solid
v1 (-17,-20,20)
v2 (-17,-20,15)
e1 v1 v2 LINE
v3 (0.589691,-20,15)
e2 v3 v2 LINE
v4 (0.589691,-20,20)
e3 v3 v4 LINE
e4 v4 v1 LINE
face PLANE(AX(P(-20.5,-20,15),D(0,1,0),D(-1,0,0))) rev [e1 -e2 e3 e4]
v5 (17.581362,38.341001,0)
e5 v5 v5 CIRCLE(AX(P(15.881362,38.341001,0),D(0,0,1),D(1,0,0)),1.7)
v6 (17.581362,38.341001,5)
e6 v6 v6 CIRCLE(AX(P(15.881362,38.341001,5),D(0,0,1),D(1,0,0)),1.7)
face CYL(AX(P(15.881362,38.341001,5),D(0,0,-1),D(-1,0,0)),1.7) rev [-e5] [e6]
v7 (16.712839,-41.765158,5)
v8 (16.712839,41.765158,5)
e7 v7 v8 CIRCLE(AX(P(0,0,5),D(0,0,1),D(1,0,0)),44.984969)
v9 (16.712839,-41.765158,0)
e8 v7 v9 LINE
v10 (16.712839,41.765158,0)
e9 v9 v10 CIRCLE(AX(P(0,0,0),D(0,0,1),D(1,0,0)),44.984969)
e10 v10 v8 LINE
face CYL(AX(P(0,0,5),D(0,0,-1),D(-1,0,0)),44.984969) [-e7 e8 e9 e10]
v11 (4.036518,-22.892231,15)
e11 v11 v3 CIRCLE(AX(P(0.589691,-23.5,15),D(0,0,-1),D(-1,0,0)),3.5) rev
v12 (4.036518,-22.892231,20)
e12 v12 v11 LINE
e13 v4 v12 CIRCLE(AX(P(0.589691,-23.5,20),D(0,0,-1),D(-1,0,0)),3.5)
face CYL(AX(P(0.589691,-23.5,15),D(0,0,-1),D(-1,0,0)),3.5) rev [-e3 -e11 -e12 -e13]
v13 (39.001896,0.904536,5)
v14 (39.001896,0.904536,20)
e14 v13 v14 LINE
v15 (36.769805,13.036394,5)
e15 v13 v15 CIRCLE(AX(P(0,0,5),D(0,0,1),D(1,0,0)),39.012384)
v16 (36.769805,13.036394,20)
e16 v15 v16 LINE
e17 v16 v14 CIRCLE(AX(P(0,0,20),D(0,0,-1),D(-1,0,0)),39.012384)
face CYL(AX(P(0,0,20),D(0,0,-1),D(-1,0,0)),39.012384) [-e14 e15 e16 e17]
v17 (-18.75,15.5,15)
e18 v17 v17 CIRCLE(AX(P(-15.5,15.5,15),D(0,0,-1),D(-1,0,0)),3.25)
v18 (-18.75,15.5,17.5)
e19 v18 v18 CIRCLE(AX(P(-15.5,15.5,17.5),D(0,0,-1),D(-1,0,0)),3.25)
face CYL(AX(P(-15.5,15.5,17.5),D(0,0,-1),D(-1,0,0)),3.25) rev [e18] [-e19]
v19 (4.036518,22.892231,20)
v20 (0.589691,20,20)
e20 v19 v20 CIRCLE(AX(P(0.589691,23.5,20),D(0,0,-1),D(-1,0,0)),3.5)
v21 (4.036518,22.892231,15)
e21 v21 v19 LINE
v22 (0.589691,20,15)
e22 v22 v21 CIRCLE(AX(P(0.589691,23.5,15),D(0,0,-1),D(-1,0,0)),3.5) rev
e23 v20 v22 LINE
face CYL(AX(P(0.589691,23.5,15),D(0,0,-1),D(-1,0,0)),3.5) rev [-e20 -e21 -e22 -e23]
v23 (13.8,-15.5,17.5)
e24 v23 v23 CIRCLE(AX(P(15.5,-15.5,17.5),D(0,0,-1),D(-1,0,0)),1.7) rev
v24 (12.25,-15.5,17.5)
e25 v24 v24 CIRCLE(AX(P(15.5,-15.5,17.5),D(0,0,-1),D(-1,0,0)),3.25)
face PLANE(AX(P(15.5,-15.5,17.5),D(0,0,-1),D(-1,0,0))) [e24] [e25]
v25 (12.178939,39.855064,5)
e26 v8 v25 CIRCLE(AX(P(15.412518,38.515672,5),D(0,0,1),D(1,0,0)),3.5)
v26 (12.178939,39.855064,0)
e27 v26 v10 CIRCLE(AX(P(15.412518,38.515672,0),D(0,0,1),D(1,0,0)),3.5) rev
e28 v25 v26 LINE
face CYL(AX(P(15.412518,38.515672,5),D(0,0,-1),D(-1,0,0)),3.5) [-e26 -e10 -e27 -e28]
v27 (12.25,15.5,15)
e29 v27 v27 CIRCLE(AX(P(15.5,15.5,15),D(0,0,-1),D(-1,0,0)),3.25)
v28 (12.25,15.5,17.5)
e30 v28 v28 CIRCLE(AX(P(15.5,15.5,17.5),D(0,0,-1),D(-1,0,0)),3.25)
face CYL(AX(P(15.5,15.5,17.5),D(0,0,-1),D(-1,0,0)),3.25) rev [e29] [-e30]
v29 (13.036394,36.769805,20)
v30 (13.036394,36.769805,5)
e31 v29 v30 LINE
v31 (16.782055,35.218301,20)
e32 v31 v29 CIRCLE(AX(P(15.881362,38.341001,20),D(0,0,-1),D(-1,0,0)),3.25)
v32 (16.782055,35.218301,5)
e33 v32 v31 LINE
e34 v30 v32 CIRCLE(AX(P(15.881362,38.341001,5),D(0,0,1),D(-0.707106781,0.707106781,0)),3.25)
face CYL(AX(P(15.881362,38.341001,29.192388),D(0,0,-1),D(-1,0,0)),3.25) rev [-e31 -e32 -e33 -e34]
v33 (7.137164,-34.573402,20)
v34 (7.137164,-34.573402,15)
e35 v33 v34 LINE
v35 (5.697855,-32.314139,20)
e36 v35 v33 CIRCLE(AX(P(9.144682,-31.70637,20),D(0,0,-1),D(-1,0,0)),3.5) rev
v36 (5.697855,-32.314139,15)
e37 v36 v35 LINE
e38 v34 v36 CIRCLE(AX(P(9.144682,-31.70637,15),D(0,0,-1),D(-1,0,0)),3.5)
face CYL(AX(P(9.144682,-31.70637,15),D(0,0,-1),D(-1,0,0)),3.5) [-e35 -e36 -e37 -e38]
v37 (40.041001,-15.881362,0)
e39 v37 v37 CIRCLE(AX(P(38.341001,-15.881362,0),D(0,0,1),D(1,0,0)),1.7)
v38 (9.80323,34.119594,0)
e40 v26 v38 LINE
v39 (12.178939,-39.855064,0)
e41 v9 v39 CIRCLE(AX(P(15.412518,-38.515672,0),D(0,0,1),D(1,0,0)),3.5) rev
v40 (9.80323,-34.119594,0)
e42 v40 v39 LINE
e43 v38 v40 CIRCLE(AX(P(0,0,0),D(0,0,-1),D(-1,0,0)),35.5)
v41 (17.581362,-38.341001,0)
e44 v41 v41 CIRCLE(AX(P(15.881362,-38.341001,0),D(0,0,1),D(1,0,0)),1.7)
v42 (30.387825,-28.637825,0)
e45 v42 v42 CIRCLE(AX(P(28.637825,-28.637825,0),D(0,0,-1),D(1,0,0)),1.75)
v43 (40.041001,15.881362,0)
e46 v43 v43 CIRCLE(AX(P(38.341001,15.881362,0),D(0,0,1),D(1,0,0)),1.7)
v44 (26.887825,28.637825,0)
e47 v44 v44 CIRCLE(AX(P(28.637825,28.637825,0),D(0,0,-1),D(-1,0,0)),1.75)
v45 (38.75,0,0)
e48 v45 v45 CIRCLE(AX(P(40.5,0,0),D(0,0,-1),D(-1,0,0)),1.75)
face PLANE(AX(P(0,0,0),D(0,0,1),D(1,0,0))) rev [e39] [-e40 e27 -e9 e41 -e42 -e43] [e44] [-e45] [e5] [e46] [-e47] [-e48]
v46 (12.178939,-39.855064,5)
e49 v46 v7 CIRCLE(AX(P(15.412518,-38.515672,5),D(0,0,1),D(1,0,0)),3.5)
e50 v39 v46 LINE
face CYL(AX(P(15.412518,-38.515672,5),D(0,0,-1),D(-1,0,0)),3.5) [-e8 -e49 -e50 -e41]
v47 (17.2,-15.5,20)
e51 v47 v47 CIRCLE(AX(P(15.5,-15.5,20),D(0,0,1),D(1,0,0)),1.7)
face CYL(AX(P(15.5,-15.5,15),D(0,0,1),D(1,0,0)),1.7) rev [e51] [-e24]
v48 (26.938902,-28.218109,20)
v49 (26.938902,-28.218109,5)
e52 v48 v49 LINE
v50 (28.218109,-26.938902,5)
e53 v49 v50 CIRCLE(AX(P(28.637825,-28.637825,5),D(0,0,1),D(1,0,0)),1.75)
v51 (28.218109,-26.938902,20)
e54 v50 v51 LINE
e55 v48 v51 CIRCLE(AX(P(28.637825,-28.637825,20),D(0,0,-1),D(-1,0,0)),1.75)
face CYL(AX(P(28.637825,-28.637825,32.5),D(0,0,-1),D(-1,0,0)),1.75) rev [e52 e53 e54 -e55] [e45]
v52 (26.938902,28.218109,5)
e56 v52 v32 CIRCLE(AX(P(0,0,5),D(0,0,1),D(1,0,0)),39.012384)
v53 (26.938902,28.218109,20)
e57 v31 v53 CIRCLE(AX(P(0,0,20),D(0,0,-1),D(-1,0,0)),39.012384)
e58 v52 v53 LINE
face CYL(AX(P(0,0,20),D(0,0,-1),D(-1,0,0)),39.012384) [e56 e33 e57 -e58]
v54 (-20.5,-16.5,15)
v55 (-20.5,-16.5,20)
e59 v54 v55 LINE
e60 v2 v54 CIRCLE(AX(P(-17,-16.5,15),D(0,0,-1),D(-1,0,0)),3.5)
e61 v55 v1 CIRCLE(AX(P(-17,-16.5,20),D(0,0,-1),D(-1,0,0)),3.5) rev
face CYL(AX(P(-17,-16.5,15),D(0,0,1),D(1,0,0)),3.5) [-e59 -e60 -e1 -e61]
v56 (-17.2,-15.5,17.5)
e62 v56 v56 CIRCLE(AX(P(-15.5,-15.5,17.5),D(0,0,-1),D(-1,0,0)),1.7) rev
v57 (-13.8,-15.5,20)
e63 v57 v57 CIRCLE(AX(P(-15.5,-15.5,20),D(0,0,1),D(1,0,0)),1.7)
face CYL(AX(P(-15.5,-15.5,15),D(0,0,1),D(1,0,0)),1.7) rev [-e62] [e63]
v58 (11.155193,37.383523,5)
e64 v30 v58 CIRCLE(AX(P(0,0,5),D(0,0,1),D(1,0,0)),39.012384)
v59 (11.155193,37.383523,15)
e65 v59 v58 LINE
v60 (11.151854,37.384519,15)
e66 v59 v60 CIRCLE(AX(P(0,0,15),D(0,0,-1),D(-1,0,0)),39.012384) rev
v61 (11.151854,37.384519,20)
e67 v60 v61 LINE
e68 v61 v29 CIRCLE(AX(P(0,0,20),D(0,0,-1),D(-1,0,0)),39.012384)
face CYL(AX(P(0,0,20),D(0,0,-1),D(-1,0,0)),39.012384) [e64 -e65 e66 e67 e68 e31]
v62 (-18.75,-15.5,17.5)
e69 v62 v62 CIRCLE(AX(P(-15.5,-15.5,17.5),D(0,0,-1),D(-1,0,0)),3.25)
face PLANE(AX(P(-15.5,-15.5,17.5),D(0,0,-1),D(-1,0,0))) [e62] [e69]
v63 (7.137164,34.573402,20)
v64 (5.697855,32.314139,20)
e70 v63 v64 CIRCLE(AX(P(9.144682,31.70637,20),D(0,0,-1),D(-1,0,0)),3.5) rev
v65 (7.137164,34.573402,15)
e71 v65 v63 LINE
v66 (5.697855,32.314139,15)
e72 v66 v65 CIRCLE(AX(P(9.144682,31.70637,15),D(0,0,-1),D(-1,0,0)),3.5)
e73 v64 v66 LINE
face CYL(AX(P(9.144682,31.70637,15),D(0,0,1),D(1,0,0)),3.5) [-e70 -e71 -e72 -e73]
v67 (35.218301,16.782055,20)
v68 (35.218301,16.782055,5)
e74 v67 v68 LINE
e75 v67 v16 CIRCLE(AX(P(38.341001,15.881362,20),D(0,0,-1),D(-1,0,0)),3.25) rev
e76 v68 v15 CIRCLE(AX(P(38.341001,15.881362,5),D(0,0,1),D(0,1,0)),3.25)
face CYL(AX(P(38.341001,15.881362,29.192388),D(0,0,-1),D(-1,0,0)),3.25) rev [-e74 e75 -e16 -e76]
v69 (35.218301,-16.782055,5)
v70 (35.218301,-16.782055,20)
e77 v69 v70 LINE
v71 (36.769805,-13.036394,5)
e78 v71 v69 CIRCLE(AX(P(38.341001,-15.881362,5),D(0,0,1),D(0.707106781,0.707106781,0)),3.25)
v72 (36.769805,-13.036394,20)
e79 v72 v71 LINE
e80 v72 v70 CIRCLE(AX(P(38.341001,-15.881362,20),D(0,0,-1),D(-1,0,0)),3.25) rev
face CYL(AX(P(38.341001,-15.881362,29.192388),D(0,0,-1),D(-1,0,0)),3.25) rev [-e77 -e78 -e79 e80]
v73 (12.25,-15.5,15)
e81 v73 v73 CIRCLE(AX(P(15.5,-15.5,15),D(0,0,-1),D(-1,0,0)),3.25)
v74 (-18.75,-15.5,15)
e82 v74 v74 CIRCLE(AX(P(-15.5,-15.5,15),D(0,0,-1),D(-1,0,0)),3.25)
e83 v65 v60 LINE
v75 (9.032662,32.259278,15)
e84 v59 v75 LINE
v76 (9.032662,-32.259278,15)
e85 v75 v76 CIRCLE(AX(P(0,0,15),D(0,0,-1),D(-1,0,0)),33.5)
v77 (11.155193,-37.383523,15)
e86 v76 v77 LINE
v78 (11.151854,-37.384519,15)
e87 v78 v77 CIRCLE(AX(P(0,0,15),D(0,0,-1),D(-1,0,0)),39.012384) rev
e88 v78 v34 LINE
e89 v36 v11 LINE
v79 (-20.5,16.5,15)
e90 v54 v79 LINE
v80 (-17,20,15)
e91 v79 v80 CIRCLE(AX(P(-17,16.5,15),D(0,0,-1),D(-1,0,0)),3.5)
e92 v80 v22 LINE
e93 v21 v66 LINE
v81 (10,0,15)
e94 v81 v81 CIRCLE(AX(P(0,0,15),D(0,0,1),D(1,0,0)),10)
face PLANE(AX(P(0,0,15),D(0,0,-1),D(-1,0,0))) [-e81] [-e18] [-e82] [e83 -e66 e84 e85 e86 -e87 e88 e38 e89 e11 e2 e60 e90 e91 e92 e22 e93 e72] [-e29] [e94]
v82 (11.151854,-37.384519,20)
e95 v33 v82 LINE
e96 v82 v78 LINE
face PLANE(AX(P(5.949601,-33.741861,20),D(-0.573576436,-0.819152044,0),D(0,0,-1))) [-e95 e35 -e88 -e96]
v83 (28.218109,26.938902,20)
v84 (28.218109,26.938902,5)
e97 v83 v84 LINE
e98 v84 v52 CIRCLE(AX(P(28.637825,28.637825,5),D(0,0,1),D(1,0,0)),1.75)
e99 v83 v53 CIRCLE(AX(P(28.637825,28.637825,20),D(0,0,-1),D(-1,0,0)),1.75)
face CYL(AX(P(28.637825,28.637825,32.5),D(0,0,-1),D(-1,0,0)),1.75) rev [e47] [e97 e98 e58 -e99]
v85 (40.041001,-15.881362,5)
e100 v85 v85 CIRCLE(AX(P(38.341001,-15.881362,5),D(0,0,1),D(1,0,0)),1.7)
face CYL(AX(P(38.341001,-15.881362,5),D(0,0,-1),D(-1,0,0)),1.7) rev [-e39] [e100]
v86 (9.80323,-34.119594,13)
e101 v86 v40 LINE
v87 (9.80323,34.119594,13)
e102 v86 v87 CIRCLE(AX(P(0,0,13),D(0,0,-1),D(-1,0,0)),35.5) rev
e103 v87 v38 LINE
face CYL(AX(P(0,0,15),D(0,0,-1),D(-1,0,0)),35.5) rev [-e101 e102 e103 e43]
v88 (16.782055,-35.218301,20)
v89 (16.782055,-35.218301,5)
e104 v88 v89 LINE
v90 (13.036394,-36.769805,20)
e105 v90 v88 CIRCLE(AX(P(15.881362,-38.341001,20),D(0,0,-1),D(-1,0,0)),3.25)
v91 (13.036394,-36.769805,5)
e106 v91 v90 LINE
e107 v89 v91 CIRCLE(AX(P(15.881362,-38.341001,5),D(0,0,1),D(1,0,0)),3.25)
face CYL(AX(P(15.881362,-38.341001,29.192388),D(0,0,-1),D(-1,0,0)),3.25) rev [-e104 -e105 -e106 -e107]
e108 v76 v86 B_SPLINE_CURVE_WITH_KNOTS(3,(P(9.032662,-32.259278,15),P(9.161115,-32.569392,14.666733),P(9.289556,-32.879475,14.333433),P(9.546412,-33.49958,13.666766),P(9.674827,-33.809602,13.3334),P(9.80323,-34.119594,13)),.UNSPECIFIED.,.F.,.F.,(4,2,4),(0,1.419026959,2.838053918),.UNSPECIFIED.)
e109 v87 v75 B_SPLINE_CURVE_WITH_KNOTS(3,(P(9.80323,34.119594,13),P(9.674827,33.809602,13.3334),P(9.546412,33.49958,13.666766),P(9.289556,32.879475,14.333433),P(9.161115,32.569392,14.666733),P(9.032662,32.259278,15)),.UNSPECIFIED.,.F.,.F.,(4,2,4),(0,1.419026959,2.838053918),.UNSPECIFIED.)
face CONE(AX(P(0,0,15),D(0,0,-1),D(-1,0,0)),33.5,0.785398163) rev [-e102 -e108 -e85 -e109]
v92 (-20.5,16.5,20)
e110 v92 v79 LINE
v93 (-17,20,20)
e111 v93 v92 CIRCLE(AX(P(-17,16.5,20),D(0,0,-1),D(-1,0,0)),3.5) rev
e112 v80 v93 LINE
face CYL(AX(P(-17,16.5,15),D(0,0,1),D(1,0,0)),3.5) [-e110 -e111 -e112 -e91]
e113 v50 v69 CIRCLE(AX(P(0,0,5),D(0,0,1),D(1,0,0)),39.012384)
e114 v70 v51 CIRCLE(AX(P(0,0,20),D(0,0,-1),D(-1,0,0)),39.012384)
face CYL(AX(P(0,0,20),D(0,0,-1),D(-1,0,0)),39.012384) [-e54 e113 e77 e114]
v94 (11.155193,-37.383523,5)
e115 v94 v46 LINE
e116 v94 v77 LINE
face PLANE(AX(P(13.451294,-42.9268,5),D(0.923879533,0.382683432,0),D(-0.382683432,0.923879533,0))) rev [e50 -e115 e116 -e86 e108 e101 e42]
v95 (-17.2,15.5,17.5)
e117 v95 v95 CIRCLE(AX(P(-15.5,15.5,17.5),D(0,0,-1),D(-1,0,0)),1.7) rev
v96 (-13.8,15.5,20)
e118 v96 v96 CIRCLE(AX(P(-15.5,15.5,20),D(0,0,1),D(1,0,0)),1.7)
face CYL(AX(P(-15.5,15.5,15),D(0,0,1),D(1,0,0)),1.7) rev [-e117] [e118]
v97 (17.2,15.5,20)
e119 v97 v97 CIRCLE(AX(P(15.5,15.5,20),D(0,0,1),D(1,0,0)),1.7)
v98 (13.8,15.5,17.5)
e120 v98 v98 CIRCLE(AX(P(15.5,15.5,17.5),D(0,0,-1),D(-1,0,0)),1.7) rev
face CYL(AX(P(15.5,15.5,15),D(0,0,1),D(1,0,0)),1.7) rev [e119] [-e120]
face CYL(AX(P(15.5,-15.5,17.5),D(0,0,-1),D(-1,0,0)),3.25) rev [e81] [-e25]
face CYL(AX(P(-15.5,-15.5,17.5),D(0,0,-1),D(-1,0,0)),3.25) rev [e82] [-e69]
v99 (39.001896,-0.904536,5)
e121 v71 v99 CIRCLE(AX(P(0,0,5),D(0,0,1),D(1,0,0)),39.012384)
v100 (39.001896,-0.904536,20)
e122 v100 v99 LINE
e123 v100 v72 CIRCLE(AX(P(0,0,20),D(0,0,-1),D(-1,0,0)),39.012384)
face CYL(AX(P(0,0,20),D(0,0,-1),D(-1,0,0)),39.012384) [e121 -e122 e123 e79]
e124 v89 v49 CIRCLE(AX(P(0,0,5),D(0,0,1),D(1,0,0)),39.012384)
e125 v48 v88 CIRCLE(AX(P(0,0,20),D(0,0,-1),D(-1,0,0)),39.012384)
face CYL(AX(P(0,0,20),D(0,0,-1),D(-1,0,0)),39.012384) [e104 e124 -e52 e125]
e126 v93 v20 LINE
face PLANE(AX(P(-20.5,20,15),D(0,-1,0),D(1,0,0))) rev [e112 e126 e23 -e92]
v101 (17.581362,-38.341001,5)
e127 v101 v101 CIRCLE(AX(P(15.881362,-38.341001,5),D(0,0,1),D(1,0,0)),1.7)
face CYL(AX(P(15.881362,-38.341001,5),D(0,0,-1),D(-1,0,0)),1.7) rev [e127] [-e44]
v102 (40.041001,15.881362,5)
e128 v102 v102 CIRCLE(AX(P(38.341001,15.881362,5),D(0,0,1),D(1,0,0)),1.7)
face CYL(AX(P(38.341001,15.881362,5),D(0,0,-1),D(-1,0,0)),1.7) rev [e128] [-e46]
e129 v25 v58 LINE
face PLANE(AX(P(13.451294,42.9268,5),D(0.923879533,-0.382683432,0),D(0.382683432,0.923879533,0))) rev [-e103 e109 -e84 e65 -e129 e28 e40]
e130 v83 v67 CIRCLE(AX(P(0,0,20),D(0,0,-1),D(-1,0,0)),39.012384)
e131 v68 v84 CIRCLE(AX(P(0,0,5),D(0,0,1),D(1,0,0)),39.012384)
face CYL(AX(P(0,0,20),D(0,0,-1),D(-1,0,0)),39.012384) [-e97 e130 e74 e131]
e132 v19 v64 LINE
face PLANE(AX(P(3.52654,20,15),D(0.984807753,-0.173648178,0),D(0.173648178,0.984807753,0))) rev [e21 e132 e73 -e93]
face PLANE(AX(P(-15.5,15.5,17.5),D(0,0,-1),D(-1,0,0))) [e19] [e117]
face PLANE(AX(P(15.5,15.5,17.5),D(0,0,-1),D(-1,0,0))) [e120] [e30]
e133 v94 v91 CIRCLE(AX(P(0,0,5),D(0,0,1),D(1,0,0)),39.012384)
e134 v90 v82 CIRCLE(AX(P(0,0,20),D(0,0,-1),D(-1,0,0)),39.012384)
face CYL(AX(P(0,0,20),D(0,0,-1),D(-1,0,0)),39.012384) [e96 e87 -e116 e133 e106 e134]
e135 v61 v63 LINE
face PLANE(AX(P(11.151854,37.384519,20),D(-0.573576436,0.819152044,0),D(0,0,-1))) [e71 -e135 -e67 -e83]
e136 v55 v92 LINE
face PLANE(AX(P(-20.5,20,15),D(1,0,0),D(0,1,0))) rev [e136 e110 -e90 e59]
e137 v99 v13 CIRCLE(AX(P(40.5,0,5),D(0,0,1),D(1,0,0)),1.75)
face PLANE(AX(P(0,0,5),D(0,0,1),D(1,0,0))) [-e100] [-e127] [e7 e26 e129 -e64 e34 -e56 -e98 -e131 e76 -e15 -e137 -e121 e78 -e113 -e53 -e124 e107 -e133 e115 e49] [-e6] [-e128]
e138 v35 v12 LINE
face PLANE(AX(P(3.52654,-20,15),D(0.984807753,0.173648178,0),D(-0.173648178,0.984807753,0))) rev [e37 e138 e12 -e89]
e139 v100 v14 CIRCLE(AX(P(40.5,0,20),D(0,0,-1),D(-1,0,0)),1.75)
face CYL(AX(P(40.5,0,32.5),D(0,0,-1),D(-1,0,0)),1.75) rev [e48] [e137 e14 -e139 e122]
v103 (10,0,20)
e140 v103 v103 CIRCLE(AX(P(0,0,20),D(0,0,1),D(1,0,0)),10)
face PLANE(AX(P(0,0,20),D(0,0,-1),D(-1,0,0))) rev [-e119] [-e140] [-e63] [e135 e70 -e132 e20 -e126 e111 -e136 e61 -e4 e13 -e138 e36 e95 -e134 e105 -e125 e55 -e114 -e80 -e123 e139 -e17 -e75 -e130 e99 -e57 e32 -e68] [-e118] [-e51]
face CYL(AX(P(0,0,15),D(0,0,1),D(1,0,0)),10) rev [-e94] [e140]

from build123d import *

# Parameters (mm, degrees)
CROQUIS1_R              = 1.7
SALIENTE_EXTRUIR1_DEPTH = 5
CROQUIS2_R              = 39.012383989
SALIENTE_EXTRUIR2_DEPTH = 20
CORTAR_EXTRUIR1_START   = -5
CROQUIS3_R              = 1.7
CROQUIS3_R_2            = 10
CORTAR_EXTRUIR1_DEPTH   = 5
CORTAR_EXTRUIR2_DEPTH   = 15
CHAFL_N1_SIZE           = 4.75
REDONDEO2_R             = 3.5
CROQUIS5_R              = 3.25
CORTAR_EXTRUIR3_DEPTH   = 15
MATRIZC1_COUNT          = 4
MATRIZC1_ANGLE          = 135
CROQUIS6_R              = 3.25
CORTAR_EXTRUIR4_DEPTH   = 2.5
CHAFL_N4_SIZE           = 2
CROQUIS8_R              = 1.75
CORTAR_EXTRUIR5_DEPTH   = 32.5


with BuildPart() as part:
    # Croquis1 → Saliente-Extruir1 (new body)
    with BuildSketch(Plane.XY):
        with BuildLine():
            Line((13.451293891, 42.926799862), (10.772509864, 36.459643134))
            ThreePointArc((10.772509864, 36.459643134), (38.017792496, 0), (10.772509864, -36.459643134))
            Line((10.772509864, -36.459643134), (13.451293891, -42.926799862))
            ThreePointArc((13.451293891, -42.926799862), (44.984969198, 0), (13.451293891, 42.926799862))
        make_face()
        with Locations((15.881362443, 38.341000599)):
            Circle(CROQUIS1_R, mode=Mode.SUBTRACT)
        with Locations((38.341000599, 15.881362443)):
            Circle(CROQUIS1_R, mode=Mode.SUBTRACT)
        with Locations((38.341000599, -15.881362443)):
            Circle(CROQUIS1_R, mode=Mode.SUBTRACT)
        with Locations((15.881362443, -38.341000599)):
            Circle(CROQUIS1_R, mode=Mode.SUBTRACT)
    extrude(amount=SALIENTE_EXTRUIR1_DEPTH)

    # Croquis2 → Saliente-Extruir2 (add)
    with BuildSketch(Plane(origin=(0, 0, 0), x_dir=(-1, 0, 0), z_dir=(0, 0, -1))):
        Circle(CROQUIS2_R)
    extrude(amount=-SALIENTE_EXTRUIR2_DEPTH)

    # Croquis3 → Cortar-Extruir1 (cut)
    with BuildSketch(Plane.XY.offset(20).offset(CORTAR_EXTRUIR1_START)):
        with Locations((-15.5, 15.5)):
            Circle(CROQUIS3_R)
        with Locations((15.5, 15.5)):
            Circle(CROQUIS3_R)
        with Locations((15.5, -15.5)):
            Circle(CROQUIS3_R)
        with Locations((-15.5, -15.5)):
            Circle(CROQUIS3_R)
        Circle(CROQUIS3_R_2)
        with BuildLine():
            Line((-20.5, 20), (-20.5, -20))
            Line((-20.5, -20), (3.526539614, -20))
            Line((3.526539614, -20), (6.774429386, -38.419698215))
            ThreePointArc((6.774429386, -38.419698215), (-39.012383989, 0), (6.774429386, 38.419698215))
            Line((6.774429386, 38.419698215), (3.526539614, 20))
            Line((3.526539614, 20), (-20.5, 20))
        make_face()
    extrude(amount=CORTAR_EXTRUIR1_DEPTH, mode=Mode.SUBTRACT)

    # Croquis4 → Cortar-Extruir2 (cut)
    with BuildSketch(Plane(origin=(0, 0, 0), x_dir=(-1, 0, 0), z_dir=(0, 0, -1))):
        with BuildLine():
            Line((-13.451293891, 42.926799862), (-11.155193297, 37.383522667))
            Line((-11.155193297, 37.383522667), (-9.803229729, 34.119593885))
            ThreePointArc((-9.803229729, 34.119593885), (-35.5, 0), (-9.803229729, -34.119593885))
            Line((-9.803229729, -34.119593885), (-11.155193297, -37.383522667))
            Line((-11.155193297, -37.383522667), (-13.451293891, -42.926799862))
            ThreePointArc((-13.451293891, -42.926799862), (44.984969198, 0), (-13.451293891, 42.926799862))
        make_face()
    extrude(amount=-CORTAR_EXTRUIR2_DEPTH, mode=Mode.SUBTRACT)

    # Chaflán1
    # the kernel refuses this chamfer: 4.75 mm, written as the material it takes off along each edge
    with BuildSketch(Plane(origin=(6.774429386, -38.419698215, 2.784505807), x_dir=(0.973158962162818, 0.2301339487389611, 0), z_dir=(0, 0, 1))) as chafl_n1_piece_1:
        with BuildLine():
            Line((4.498160378, 0), (CHAFL_N1_SIZE * 0.0576504165896, CHAFL_N1_SIZE * 0.998336831669))
            Line((CHAFL_N1_SIZE * 0.0576504165896, CHAFL_N1_SIZE * 0.998336831669), (0, 0))
            ThreePointArc((0, 0), (2.312261051, -0.064833001), (4.498160378, 0))
        make_face()
    extrude(amount=29.430988386, mode=Mode.SUBTRACT)
    with BuildSketch(Plane(origin=(6.774429386, 38.419698215, 2.784505807), x_dir=(0.9731589621628183, -0.23013394873896015, 0), z_dir=(0, 0, 1))) as chafl_n1_piece_2:
        with BuildLine():
            Line((4.498160378, 0), (CHAFL_N1_SIZE * 0.0576504165896, -CHAFL_N1_SIZE * 0.998336831669))
            Line((CHAFL_N1_SIZE * 0.0576504165896, -CHAFL_N1_SIZE * 0.998336831669), (0, 0))
            ThreePointArc((0, 0), (2.312261051, 0.064833001), (4.498160378, 0))
        make_face()
    extrude(amount=29.430988386, mode=Mode.SUBTRACT)

    # Redondeo2
    redondeo2_edges = [part.edges().sort_by_distance(p)[0] for p in [
        (5.949600542, 33.741861389, 17.5),
        (5.949600542, -33.741861389, 17.5),
        (3.526539614, 20, 17.5),
        (-20.5, 20, 17.5),
        (-20.5, -20, 17.5),
        (3.526539614, -20, 17.5),
        (13.451293891, -42.926799862, 2.5),
        (13.451293891, 42.926799862, 2.5),
    ]]
    fillet(redondeo2_edges, radius=REDONDEO2_R)

    # Croquis5 → Cortar-Extruir3 (cut)
    with BuildSketch(Plane.XY.offset(5)):
        with Locations((15.881362443, -38.341000599)):
            Circle(CROQUIS5_R)
    cortar_extruir3 = extrude(amount=CORTAR_EXTRUIR3_DEPTH, mode=Mode.SUBTRACT)

    # MatrizC1: Cortar-Extruir3 ×4 about axis
    matrizc1_axis = Axis((0, 0, 0), (0, 0, 1))
    for i in range(1, MATRIZC1_COUNT):
        add(cortar_extruir3.rotate(matrizc1_axis, i * MATRIZC1_ANGLE / (MATRIZC1_COUNT - 1)), mode=Mode.SUBTRACT)

    # Croquis6 → Cortar-Extruir4 (cut)
    with BuildSketch(Plane(origin=(0, 0, 15), x_dir=(-1, 0, 0), z_dir=(0, 0, -1))):
        with Locations((15.5, 15.5)):
            Circle(CROQUIS6_R)
        with Locations((15.5, -15.5)):
            Circle(CROQUIS6_R)
        with Locations((-15.5, -15.5)):
            Circle(CROQUIS6_R)
        with Locations((-15.5, 15.5)):
            Circle(CROQUIS6_R)
    extrude(amount=-CORTAR_EXTRUIR4_DEPTH, mode=Mode.SUBTRACT)

    # Chaflán4
    chafl_n4_edges = [part.edges().sort_by_distance(p)[0] for p in [
        (35.5, 0, 15),
    ]]
    chamfer(chafl_n4_edges, length=CHAFL_N4_SIZE)

    # Croquis8 → Cortar-Extruir5 (cut)
    with BuildSketch(Plane(origin=(0, 0, 0), x_dir=(-1, 0, 0), z_dir=(0, 0, -1))):
        with Locations((-40.5, 0)):
            Circle(CROQUIS8_R)
        with Locations(Location((-28.637824638, -28.637824638, 0), (0, 0, 13.876951429))):
            Circle(CROQUIS8_R)
        with Locations((-28.637824638, 28.637824638)):
            Circle(CROQUIS8_R)
    extrude(amount=-CORTAR_EXTRUIR5_DEPTH, mode=Mode.SUBTRACT)


solid = part.part
